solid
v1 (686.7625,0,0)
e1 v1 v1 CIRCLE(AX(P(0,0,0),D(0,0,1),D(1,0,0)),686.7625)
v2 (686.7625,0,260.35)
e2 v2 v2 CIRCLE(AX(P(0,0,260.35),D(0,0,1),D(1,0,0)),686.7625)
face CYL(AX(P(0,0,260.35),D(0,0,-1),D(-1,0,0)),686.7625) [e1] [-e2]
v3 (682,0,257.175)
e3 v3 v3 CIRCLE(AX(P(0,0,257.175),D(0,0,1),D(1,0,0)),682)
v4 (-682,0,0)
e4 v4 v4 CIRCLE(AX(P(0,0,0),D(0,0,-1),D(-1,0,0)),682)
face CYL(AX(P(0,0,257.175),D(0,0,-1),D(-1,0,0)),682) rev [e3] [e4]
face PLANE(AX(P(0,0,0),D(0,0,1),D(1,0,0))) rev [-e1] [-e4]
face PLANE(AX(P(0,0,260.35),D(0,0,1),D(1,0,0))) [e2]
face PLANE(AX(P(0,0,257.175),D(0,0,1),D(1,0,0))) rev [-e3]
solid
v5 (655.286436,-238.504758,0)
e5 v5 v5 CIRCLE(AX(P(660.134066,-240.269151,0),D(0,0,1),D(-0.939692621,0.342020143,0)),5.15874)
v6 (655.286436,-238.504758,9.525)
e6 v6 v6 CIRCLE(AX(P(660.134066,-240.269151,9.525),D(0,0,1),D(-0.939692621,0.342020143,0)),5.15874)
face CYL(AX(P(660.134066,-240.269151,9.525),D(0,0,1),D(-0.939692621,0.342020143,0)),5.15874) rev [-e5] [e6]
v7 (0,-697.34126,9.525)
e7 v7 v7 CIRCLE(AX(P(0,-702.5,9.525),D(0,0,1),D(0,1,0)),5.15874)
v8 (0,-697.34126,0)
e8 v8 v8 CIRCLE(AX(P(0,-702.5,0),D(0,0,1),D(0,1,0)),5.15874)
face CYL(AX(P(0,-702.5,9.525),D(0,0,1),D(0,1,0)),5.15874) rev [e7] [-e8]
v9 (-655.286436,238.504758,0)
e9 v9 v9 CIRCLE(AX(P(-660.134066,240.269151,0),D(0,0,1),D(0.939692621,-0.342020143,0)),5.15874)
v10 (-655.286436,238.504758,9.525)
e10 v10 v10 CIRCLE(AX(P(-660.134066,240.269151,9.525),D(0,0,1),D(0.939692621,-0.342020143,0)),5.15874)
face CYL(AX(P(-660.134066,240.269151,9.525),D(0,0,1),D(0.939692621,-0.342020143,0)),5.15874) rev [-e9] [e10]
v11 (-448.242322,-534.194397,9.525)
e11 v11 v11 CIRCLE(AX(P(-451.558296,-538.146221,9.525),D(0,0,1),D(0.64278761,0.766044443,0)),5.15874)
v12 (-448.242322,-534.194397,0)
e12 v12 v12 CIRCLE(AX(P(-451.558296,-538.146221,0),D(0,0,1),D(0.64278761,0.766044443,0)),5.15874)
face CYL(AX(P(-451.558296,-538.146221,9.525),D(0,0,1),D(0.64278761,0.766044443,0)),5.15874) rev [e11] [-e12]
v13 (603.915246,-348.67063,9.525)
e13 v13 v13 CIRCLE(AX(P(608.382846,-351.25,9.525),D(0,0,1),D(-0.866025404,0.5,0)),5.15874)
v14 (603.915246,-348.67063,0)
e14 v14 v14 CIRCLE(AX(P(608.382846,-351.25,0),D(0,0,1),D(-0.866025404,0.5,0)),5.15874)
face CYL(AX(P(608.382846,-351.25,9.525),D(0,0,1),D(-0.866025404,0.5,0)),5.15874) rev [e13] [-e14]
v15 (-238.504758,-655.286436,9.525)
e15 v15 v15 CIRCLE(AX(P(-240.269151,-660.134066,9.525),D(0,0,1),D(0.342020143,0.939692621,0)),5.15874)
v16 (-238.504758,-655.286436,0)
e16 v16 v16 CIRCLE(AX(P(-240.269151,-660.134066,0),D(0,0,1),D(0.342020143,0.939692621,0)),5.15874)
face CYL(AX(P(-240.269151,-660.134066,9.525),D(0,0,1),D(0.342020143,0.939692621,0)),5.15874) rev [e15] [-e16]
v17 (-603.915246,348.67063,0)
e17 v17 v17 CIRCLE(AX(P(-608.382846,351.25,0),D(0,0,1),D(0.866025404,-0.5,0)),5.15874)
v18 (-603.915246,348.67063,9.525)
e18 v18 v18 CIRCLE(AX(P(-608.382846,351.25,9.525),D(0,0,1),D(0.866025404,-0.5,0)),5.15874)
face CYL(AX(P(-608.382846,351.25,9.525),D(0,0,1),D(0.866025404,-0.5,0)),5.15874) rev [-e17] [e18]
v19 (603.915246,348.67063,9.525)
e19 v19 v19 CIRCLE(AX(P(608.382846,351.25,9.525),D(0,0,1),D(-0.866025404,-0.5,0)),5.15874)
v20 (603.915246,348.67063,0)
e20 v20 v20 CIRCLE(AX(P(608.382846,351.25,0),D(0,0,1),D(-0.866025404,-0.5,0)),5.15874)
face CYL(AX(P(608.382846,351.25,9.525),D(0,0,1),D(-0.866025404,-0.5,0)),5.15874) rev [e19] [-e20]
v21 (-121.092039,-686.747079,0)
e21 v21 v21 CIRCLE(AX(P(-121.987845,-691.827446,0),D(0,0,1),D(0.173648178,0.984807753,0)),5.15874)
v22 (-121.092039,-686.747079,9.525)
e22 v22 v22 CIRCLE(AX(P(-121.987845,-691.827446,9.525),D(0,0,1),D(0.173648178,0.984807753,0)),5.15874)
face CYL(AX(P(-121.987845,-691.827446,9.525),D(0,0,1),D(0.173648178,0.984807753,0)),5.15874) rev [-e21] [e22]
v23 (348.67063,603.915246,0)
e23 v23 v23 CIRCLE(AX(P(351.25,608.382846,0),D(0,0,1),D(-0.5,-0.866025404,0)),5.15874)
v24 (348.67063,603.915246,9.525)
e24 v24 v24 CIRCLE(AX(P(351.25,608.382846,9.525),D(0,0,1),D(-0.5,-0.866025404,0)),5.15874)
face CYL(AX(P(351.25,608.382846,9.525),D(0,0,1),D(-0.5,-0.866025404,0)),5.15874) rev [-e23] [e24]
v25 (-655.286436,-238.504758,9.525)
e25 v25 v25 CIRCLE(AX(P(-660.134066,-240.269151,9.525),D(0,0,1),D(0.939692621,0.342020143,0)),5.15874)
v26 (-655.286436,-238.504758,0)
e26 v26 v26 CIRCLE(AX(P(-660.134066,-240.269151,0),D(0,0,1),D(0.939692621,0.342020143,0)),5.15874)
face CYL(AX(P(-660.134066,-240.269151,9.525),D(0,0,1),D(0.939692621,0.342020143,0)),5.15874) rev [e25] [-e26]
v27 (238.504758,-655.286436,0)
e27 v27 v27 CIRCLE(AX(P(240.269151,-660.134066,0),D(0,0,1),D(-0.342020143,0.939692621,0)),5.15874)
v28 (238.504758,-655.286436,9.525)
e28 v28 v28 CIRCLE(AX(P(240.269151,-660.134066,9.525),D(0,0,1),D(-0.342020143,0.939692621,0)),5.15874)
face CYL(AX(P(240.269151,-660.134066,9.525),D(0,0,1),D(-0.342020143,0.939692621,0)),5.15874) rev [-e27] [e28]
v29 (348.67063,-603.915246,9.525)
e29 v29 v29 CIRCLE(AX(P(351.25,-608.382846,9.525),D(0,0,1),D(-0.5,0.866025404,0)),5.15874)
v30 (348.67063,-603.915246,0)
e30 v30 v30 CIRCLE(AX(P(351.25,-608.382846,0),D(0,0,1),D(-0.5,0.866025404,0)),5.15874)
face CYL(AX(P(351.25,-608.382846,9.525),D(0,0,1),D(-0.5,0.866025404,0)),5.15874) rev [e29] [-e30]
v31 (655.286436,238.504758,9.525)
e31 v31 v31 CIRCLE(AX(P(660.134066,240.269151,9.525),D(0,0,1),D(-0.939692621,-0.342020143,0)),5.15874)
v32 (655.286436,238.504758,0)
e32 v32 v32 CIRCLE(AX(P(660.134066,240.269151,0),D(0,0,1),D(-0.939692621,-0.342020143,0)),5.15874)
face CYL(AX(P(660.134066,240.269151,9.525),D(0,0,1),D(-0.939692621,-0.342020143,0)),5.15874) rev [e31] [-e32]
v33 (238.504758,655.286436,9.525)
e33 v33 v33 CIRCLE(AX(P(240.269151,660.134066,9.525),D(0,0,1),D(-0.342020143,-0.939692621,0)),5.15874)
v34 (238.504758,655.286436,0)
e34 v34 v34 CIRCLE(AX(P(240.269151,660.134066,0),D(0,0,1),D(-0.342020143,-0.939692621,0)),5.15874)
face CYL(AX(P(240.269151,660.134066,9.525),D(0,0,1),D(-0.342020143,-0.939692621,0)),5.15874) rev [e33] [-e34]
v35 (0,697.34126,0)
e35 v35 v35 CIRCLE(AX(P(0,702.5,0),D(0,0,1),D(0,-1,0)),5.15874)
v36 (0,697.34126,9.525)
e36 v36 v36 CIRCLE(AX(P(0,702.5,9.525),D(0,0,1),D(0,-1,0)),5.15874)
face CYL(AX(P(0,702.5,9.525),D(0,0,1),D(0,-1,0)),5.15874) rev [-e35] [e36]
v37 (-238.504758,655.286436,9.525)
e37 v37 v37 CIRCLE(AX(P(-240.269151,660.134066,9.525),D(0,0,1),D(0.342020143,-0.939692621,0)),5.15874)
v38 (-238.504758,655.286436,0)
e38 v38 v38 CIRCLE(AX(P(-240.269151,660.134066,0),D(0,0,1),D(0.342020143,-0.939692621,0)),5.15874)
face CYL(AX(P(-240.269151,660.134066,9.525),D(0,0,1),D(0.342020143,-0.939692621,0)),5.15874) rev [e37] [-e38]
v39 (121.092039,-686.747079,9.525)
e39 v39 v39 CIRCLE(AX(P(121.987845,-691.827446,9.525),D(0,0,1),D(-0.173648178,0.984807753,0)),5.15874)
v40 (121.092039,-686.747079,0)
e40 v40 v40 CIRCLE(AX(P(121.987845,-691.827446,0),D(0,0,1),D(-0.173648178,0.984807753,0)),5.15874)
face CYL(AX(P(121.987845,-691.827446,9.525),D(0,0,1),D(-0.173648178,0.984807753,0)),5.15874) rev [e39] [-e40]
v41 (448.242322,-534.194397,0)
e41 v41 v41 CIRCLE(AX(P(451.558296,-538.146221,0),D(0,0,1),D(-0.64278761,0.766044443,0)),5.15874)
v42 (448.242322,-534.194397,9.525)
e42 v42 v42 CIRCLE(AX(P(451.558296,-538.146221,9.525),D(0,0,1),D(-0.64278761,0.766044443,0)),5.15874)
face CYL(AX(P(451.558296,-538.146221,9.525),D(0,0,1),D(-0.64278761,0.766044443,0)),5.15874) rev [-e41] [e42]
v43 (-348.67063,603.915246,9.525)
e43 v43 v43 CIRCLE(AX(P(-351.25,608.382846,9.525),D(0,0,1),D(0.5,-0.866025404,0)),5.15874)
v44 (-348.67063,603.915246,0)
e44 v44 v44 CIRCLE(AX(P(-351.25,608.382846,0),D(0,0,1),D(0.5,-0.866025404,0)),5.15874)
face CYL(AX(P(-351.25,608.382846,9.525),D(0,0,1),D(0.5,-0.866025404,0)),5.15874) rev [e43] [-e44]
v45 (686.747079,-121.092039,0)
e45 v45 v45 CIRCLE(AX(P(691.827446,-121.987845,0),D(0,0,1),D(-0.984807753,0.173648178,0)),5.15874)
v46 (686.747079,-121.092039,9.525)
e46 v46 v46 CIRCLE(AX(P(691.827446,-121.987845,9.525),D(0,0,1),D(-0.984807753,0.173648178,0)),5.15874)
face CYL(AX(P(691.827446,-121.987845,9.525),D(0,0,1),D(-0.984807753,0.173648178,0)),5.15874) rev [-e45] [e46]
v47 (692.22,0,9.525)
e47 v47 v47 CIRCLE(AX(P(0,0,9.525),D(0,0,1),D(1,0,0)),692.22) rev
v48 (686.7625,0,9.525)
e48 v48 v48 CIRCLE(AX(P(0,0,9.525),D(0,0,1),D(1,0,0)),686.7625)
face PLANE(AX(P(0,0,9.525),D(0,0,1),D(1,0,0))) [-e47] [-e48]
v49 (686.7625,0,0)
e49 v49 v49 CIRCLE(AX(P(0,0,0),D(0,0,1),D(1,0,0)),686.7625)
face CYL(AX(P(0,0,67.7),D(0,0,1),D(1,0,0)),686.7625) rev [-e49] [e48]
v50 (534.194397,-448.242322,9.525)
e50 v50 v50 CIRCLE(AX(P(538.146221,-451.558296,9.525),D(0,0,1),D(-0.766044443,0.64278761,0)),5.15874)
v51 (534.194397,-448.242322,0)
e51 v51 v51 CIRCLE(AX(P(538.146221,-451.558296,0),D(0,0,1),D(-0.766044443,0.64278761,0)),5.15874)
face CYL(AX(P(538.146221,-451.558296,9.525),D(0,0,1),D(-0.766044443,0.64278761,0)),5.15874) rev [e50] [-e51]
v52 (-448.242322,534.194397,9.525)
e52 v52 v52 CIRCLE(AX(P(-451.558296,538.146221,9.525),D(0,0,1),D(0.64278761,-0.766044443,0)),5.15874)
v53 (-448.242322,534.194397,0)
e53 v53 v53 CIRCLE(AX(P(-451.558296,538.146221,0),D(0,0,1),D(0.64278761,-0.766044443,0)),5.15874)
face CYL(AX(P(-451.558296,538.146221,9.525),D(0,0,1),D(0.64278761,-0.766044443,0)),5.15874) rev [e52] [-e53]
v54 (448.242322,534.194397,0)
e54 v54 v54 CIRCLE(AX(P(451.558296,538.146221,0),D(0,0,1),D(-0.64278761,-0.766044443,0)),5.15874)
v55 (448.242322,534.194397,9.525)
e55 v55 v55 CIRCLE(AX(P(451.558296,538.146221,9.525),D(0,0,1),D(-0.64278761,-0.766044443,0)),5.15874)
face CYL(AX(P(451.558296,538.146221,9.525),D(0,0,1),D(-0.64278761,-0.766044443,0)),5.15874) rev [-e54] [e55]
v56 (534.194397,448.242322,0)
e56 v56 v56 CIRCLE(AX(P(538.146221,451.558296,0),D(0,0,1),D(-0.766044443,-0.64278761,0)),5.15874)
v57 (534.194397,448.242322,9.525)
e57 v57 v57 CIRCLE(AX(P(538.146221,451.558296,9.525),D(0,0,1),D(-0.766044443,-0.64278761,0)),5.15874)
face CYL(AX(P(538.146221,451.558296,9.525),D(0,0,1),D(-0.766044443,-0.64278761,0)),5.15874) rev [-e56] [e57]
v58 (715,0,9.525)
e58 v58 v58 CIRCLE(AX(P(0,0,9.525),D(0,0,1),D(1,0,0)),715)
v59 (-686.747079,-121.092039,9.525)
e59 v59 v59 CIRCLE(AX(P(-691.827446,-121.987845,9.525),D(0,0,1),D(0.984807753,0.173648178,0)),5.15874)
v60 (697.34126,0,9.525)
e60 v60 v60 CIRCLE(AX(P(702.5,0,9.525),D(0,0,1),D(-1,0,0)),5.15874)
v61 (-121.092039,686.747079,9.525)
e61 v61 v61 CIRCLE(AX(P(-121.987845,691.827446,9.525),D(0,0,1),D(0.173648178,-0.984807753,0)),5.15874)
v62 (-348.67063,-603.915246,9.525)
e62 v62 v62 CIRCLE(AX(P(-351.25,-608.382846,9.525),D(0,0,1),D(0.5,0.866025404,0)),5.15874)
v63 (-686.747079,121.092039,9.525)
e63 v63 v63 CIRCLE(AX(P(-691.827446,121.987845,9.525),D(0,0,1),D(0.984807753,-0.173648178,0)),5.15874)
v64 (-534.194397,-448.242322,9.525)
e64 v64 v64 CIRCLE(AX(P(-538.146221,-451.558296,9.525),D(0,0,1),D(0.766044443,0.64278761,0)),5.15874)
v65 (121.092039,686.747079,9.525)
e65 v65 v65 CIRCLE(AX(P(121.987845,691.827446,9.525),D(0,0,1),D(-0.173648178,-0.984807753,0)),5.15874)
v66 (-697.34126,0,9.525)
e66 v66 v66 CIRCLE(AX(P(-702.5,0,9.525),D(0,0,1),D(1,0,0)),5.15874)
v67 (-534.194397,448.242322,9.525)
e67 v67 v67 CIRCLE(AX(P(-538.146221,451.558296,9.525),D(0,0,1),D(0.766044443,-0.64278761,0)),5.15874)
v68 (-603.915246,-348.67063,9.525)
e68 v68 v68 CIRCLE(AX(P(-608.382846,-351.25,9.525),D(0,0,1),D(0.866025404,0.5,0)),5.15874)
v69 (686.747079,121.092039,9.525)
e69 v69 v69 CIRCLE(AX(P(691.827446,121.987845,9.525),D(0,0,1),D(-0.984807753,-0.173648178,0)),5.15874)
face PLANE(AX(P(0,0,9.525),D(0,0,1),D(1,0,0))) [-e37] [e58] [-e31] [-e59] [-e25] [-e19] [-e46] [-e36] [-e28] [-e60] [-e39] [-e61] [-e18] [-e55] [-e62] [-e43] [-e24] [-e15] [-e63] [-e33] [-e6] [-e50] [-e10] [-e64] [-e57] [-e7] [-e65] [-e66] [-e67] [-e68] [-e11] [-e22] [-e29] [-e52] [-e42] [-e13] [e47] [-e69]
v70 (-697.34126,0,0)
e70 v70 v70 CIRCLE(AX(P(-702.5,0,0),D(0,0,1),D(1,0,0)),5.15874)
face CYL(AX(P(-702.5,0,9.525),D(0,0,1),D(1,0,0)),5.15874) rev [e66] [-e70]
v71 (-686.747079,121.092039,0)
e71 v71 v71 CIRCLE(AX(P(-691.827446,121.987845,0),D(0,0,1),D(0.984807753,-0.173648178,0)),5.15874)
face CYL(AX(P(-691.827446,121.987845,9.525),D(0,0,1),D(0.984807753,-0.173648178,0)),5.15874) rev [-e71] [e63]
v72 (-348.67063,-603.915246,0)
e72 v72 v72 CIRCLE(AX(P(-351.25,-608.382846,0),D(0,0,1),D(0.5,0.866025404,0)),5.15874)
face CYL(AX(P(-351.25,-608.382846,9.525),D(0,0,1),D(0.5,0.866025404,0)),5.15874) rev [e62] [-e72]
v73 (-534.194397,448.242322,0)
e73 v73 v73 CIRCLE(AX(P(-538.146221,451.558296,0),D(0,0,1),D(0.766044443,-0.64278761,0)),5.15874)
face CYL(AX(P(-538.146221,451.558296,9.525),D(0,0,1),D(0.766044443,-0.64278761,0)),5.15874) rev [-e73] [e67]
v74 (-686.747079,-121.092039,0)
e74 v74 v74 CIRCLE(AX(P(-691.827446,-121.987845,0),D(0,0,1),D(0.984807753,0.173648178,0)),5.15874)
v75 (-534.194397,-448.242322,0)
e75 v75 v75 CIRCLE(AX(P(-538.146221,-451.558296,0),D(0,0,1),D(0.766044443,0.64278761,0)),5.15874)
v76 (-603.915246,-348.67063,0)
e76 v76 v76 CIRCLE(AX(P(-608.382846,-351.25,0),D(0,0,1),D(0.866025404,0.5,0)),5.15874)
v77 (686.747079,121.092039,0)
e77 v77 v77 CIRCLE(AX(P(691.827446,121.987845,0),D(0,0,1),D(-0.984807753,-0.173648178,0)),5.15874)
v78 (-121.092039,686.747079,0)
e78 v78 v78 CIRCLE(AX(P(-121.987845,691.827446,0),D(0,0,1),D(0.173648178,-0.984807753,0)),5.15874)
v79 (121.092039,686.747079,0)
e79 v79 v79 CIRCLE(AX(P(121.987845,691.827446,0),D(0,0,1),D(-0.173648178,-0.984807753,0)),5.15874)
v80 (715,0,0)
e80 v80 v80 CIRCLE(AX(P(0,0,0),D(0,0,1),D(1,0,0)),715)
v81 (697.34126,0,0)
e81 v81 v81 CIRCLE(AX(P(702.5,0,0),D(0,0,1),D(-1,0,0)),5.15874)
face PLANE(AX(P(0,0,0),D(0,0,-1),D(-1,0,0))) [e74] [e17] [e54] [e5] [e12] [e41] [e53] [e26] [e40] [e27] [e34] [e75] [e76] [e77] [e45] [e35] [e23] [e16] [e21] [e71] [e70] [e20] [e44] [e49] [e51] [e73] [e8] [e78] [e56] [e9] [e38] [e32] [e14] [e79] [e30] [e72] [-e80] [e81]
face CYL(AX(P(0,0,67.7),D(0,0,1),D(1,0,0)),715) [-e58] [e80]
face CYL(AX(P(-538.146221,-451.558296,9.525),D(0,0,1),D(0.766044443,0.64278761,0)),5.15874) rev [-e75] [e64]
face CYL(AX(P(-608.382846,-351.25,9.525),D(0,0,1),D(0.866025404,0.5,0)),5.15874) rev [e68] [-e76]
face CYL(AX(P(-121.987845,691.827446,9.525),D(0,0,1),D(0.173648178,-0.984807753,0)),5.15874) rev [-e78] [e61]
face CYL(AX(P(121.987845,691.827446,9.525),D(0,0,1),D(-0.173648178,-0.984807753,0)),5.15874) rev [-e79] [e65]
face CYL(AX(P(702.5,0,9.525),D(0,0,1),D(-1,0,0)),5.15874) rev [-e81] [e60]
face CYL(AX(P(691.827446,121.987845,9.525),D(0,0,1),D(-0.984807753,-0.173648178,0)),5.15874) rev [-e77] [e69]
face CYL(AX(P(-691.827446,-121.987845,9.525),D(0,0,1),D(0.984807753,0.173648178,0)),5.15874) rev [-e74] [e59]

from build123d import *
from build123d.topology import SkipClean

# Parameters (mm, degrees)
SKETCH2_W                           = 28.237500084
SKETCH2_H                           = 9.525
SKETCH4_R                           = 682
CUT_EXTRUDE_CLEAR_BOTTOM_FACE_DEPTH = 12.7
SKETCH6_W                           = 5.15874
SKETCH6_H                           = 9.525
CIRPATTERN_36X_COUNT                = 36


# Read off the part's stored shape, not the designer's step: Extrude-Thin - Walls_Cap Ends
with BuildPart() as part:
    # Sketch2 → Revolve1 (revolve)
    with BuildSketch(Plane(origin=(0, 0, 0), x_dir=(1, 0, 0), z_dir=(0, 1, 0)), mode=Mode.PRIVATE) as revolve1_sk:
        with Locations((-700.881249958, -4.7625)):
            Rectangle(SKETCH2_W, SKETCH2_H)
    revolve(revolve1_sk.sketch.rotate(Axis((0, 0, 67.7), (0, 0, -1)), 180), axis=Axis((0, 0, 67.7), (0, 0, -1)))

    # Sketch6 → 3/8 Clearance Hole for Clamping Ring (revolve, cut)
    with BuildSketch(Plane(origin=(-702.5, 0, 9.525), x_dir=(0, -1, 0), z_dir=(1, 0, 0))):
        with Locations((2.57937, 4.7625)):
            Rectangle(SKETCH6_W, SKETCH6_H)
    f_3_8_clearance_hole_for_clamping_ring = revolve(axis=Axis((-702.5, 0, 15.875), (0, 0, -1)), mode=Mode.SUBTRACT)

    # CirPattern - 36X: 3/8 Clearance Hole for Clamping Ring ×36 about axis
    cirpattern_36x_axis = Axis((0, 0, 0), (0, 0, 1))
    for i in range(1, CIRPATTERN_36X_COUNT):
        add(f_3_8_clearance_hole_for_clamping_ring.rotate(cirpattern_36x_axis, i * 360 / CIRPATTERN_36X_COUNT), mode=Mode.SUBTRACT)


with BuildPart() as body_2:
    # Extrude-Thin - Walls_Cap Ends outline → Extrude-Thin - Walls_Cap Ends (revolve)
    with BuildSketch(Plane.XZ):
        Polygon((686.762499916, 260.35), (0, 260.35), (0, 257.175), (681.999999916, 257.175), (681.999999916, 3.175), (0, 3.175), (0, 0), (686.762499916, 0), align=None)
    revolve(axis=Axis((0, 0, 0), (0, 0, 1)))

    # Sketch4 → Cut-Extrude - Clear Bottom Face (cut)
    with SkipClean():  # the faces are left unmerged after this step: merging them gives an invalid solid
        with BuildSketch(Plane(origin=(0, 0, 0), x_dir=(-1, 0, 0), z_dir=(0, 0, -1))):
            Circle(SKETCH4_R)
        extrude(amount=-CUT_EXTRUDE_CLEAR_BOTTOM_FACE_DEPTH, mode=Mode.SUBTRACT)


solid = Compound([part.part, body_2.part])
